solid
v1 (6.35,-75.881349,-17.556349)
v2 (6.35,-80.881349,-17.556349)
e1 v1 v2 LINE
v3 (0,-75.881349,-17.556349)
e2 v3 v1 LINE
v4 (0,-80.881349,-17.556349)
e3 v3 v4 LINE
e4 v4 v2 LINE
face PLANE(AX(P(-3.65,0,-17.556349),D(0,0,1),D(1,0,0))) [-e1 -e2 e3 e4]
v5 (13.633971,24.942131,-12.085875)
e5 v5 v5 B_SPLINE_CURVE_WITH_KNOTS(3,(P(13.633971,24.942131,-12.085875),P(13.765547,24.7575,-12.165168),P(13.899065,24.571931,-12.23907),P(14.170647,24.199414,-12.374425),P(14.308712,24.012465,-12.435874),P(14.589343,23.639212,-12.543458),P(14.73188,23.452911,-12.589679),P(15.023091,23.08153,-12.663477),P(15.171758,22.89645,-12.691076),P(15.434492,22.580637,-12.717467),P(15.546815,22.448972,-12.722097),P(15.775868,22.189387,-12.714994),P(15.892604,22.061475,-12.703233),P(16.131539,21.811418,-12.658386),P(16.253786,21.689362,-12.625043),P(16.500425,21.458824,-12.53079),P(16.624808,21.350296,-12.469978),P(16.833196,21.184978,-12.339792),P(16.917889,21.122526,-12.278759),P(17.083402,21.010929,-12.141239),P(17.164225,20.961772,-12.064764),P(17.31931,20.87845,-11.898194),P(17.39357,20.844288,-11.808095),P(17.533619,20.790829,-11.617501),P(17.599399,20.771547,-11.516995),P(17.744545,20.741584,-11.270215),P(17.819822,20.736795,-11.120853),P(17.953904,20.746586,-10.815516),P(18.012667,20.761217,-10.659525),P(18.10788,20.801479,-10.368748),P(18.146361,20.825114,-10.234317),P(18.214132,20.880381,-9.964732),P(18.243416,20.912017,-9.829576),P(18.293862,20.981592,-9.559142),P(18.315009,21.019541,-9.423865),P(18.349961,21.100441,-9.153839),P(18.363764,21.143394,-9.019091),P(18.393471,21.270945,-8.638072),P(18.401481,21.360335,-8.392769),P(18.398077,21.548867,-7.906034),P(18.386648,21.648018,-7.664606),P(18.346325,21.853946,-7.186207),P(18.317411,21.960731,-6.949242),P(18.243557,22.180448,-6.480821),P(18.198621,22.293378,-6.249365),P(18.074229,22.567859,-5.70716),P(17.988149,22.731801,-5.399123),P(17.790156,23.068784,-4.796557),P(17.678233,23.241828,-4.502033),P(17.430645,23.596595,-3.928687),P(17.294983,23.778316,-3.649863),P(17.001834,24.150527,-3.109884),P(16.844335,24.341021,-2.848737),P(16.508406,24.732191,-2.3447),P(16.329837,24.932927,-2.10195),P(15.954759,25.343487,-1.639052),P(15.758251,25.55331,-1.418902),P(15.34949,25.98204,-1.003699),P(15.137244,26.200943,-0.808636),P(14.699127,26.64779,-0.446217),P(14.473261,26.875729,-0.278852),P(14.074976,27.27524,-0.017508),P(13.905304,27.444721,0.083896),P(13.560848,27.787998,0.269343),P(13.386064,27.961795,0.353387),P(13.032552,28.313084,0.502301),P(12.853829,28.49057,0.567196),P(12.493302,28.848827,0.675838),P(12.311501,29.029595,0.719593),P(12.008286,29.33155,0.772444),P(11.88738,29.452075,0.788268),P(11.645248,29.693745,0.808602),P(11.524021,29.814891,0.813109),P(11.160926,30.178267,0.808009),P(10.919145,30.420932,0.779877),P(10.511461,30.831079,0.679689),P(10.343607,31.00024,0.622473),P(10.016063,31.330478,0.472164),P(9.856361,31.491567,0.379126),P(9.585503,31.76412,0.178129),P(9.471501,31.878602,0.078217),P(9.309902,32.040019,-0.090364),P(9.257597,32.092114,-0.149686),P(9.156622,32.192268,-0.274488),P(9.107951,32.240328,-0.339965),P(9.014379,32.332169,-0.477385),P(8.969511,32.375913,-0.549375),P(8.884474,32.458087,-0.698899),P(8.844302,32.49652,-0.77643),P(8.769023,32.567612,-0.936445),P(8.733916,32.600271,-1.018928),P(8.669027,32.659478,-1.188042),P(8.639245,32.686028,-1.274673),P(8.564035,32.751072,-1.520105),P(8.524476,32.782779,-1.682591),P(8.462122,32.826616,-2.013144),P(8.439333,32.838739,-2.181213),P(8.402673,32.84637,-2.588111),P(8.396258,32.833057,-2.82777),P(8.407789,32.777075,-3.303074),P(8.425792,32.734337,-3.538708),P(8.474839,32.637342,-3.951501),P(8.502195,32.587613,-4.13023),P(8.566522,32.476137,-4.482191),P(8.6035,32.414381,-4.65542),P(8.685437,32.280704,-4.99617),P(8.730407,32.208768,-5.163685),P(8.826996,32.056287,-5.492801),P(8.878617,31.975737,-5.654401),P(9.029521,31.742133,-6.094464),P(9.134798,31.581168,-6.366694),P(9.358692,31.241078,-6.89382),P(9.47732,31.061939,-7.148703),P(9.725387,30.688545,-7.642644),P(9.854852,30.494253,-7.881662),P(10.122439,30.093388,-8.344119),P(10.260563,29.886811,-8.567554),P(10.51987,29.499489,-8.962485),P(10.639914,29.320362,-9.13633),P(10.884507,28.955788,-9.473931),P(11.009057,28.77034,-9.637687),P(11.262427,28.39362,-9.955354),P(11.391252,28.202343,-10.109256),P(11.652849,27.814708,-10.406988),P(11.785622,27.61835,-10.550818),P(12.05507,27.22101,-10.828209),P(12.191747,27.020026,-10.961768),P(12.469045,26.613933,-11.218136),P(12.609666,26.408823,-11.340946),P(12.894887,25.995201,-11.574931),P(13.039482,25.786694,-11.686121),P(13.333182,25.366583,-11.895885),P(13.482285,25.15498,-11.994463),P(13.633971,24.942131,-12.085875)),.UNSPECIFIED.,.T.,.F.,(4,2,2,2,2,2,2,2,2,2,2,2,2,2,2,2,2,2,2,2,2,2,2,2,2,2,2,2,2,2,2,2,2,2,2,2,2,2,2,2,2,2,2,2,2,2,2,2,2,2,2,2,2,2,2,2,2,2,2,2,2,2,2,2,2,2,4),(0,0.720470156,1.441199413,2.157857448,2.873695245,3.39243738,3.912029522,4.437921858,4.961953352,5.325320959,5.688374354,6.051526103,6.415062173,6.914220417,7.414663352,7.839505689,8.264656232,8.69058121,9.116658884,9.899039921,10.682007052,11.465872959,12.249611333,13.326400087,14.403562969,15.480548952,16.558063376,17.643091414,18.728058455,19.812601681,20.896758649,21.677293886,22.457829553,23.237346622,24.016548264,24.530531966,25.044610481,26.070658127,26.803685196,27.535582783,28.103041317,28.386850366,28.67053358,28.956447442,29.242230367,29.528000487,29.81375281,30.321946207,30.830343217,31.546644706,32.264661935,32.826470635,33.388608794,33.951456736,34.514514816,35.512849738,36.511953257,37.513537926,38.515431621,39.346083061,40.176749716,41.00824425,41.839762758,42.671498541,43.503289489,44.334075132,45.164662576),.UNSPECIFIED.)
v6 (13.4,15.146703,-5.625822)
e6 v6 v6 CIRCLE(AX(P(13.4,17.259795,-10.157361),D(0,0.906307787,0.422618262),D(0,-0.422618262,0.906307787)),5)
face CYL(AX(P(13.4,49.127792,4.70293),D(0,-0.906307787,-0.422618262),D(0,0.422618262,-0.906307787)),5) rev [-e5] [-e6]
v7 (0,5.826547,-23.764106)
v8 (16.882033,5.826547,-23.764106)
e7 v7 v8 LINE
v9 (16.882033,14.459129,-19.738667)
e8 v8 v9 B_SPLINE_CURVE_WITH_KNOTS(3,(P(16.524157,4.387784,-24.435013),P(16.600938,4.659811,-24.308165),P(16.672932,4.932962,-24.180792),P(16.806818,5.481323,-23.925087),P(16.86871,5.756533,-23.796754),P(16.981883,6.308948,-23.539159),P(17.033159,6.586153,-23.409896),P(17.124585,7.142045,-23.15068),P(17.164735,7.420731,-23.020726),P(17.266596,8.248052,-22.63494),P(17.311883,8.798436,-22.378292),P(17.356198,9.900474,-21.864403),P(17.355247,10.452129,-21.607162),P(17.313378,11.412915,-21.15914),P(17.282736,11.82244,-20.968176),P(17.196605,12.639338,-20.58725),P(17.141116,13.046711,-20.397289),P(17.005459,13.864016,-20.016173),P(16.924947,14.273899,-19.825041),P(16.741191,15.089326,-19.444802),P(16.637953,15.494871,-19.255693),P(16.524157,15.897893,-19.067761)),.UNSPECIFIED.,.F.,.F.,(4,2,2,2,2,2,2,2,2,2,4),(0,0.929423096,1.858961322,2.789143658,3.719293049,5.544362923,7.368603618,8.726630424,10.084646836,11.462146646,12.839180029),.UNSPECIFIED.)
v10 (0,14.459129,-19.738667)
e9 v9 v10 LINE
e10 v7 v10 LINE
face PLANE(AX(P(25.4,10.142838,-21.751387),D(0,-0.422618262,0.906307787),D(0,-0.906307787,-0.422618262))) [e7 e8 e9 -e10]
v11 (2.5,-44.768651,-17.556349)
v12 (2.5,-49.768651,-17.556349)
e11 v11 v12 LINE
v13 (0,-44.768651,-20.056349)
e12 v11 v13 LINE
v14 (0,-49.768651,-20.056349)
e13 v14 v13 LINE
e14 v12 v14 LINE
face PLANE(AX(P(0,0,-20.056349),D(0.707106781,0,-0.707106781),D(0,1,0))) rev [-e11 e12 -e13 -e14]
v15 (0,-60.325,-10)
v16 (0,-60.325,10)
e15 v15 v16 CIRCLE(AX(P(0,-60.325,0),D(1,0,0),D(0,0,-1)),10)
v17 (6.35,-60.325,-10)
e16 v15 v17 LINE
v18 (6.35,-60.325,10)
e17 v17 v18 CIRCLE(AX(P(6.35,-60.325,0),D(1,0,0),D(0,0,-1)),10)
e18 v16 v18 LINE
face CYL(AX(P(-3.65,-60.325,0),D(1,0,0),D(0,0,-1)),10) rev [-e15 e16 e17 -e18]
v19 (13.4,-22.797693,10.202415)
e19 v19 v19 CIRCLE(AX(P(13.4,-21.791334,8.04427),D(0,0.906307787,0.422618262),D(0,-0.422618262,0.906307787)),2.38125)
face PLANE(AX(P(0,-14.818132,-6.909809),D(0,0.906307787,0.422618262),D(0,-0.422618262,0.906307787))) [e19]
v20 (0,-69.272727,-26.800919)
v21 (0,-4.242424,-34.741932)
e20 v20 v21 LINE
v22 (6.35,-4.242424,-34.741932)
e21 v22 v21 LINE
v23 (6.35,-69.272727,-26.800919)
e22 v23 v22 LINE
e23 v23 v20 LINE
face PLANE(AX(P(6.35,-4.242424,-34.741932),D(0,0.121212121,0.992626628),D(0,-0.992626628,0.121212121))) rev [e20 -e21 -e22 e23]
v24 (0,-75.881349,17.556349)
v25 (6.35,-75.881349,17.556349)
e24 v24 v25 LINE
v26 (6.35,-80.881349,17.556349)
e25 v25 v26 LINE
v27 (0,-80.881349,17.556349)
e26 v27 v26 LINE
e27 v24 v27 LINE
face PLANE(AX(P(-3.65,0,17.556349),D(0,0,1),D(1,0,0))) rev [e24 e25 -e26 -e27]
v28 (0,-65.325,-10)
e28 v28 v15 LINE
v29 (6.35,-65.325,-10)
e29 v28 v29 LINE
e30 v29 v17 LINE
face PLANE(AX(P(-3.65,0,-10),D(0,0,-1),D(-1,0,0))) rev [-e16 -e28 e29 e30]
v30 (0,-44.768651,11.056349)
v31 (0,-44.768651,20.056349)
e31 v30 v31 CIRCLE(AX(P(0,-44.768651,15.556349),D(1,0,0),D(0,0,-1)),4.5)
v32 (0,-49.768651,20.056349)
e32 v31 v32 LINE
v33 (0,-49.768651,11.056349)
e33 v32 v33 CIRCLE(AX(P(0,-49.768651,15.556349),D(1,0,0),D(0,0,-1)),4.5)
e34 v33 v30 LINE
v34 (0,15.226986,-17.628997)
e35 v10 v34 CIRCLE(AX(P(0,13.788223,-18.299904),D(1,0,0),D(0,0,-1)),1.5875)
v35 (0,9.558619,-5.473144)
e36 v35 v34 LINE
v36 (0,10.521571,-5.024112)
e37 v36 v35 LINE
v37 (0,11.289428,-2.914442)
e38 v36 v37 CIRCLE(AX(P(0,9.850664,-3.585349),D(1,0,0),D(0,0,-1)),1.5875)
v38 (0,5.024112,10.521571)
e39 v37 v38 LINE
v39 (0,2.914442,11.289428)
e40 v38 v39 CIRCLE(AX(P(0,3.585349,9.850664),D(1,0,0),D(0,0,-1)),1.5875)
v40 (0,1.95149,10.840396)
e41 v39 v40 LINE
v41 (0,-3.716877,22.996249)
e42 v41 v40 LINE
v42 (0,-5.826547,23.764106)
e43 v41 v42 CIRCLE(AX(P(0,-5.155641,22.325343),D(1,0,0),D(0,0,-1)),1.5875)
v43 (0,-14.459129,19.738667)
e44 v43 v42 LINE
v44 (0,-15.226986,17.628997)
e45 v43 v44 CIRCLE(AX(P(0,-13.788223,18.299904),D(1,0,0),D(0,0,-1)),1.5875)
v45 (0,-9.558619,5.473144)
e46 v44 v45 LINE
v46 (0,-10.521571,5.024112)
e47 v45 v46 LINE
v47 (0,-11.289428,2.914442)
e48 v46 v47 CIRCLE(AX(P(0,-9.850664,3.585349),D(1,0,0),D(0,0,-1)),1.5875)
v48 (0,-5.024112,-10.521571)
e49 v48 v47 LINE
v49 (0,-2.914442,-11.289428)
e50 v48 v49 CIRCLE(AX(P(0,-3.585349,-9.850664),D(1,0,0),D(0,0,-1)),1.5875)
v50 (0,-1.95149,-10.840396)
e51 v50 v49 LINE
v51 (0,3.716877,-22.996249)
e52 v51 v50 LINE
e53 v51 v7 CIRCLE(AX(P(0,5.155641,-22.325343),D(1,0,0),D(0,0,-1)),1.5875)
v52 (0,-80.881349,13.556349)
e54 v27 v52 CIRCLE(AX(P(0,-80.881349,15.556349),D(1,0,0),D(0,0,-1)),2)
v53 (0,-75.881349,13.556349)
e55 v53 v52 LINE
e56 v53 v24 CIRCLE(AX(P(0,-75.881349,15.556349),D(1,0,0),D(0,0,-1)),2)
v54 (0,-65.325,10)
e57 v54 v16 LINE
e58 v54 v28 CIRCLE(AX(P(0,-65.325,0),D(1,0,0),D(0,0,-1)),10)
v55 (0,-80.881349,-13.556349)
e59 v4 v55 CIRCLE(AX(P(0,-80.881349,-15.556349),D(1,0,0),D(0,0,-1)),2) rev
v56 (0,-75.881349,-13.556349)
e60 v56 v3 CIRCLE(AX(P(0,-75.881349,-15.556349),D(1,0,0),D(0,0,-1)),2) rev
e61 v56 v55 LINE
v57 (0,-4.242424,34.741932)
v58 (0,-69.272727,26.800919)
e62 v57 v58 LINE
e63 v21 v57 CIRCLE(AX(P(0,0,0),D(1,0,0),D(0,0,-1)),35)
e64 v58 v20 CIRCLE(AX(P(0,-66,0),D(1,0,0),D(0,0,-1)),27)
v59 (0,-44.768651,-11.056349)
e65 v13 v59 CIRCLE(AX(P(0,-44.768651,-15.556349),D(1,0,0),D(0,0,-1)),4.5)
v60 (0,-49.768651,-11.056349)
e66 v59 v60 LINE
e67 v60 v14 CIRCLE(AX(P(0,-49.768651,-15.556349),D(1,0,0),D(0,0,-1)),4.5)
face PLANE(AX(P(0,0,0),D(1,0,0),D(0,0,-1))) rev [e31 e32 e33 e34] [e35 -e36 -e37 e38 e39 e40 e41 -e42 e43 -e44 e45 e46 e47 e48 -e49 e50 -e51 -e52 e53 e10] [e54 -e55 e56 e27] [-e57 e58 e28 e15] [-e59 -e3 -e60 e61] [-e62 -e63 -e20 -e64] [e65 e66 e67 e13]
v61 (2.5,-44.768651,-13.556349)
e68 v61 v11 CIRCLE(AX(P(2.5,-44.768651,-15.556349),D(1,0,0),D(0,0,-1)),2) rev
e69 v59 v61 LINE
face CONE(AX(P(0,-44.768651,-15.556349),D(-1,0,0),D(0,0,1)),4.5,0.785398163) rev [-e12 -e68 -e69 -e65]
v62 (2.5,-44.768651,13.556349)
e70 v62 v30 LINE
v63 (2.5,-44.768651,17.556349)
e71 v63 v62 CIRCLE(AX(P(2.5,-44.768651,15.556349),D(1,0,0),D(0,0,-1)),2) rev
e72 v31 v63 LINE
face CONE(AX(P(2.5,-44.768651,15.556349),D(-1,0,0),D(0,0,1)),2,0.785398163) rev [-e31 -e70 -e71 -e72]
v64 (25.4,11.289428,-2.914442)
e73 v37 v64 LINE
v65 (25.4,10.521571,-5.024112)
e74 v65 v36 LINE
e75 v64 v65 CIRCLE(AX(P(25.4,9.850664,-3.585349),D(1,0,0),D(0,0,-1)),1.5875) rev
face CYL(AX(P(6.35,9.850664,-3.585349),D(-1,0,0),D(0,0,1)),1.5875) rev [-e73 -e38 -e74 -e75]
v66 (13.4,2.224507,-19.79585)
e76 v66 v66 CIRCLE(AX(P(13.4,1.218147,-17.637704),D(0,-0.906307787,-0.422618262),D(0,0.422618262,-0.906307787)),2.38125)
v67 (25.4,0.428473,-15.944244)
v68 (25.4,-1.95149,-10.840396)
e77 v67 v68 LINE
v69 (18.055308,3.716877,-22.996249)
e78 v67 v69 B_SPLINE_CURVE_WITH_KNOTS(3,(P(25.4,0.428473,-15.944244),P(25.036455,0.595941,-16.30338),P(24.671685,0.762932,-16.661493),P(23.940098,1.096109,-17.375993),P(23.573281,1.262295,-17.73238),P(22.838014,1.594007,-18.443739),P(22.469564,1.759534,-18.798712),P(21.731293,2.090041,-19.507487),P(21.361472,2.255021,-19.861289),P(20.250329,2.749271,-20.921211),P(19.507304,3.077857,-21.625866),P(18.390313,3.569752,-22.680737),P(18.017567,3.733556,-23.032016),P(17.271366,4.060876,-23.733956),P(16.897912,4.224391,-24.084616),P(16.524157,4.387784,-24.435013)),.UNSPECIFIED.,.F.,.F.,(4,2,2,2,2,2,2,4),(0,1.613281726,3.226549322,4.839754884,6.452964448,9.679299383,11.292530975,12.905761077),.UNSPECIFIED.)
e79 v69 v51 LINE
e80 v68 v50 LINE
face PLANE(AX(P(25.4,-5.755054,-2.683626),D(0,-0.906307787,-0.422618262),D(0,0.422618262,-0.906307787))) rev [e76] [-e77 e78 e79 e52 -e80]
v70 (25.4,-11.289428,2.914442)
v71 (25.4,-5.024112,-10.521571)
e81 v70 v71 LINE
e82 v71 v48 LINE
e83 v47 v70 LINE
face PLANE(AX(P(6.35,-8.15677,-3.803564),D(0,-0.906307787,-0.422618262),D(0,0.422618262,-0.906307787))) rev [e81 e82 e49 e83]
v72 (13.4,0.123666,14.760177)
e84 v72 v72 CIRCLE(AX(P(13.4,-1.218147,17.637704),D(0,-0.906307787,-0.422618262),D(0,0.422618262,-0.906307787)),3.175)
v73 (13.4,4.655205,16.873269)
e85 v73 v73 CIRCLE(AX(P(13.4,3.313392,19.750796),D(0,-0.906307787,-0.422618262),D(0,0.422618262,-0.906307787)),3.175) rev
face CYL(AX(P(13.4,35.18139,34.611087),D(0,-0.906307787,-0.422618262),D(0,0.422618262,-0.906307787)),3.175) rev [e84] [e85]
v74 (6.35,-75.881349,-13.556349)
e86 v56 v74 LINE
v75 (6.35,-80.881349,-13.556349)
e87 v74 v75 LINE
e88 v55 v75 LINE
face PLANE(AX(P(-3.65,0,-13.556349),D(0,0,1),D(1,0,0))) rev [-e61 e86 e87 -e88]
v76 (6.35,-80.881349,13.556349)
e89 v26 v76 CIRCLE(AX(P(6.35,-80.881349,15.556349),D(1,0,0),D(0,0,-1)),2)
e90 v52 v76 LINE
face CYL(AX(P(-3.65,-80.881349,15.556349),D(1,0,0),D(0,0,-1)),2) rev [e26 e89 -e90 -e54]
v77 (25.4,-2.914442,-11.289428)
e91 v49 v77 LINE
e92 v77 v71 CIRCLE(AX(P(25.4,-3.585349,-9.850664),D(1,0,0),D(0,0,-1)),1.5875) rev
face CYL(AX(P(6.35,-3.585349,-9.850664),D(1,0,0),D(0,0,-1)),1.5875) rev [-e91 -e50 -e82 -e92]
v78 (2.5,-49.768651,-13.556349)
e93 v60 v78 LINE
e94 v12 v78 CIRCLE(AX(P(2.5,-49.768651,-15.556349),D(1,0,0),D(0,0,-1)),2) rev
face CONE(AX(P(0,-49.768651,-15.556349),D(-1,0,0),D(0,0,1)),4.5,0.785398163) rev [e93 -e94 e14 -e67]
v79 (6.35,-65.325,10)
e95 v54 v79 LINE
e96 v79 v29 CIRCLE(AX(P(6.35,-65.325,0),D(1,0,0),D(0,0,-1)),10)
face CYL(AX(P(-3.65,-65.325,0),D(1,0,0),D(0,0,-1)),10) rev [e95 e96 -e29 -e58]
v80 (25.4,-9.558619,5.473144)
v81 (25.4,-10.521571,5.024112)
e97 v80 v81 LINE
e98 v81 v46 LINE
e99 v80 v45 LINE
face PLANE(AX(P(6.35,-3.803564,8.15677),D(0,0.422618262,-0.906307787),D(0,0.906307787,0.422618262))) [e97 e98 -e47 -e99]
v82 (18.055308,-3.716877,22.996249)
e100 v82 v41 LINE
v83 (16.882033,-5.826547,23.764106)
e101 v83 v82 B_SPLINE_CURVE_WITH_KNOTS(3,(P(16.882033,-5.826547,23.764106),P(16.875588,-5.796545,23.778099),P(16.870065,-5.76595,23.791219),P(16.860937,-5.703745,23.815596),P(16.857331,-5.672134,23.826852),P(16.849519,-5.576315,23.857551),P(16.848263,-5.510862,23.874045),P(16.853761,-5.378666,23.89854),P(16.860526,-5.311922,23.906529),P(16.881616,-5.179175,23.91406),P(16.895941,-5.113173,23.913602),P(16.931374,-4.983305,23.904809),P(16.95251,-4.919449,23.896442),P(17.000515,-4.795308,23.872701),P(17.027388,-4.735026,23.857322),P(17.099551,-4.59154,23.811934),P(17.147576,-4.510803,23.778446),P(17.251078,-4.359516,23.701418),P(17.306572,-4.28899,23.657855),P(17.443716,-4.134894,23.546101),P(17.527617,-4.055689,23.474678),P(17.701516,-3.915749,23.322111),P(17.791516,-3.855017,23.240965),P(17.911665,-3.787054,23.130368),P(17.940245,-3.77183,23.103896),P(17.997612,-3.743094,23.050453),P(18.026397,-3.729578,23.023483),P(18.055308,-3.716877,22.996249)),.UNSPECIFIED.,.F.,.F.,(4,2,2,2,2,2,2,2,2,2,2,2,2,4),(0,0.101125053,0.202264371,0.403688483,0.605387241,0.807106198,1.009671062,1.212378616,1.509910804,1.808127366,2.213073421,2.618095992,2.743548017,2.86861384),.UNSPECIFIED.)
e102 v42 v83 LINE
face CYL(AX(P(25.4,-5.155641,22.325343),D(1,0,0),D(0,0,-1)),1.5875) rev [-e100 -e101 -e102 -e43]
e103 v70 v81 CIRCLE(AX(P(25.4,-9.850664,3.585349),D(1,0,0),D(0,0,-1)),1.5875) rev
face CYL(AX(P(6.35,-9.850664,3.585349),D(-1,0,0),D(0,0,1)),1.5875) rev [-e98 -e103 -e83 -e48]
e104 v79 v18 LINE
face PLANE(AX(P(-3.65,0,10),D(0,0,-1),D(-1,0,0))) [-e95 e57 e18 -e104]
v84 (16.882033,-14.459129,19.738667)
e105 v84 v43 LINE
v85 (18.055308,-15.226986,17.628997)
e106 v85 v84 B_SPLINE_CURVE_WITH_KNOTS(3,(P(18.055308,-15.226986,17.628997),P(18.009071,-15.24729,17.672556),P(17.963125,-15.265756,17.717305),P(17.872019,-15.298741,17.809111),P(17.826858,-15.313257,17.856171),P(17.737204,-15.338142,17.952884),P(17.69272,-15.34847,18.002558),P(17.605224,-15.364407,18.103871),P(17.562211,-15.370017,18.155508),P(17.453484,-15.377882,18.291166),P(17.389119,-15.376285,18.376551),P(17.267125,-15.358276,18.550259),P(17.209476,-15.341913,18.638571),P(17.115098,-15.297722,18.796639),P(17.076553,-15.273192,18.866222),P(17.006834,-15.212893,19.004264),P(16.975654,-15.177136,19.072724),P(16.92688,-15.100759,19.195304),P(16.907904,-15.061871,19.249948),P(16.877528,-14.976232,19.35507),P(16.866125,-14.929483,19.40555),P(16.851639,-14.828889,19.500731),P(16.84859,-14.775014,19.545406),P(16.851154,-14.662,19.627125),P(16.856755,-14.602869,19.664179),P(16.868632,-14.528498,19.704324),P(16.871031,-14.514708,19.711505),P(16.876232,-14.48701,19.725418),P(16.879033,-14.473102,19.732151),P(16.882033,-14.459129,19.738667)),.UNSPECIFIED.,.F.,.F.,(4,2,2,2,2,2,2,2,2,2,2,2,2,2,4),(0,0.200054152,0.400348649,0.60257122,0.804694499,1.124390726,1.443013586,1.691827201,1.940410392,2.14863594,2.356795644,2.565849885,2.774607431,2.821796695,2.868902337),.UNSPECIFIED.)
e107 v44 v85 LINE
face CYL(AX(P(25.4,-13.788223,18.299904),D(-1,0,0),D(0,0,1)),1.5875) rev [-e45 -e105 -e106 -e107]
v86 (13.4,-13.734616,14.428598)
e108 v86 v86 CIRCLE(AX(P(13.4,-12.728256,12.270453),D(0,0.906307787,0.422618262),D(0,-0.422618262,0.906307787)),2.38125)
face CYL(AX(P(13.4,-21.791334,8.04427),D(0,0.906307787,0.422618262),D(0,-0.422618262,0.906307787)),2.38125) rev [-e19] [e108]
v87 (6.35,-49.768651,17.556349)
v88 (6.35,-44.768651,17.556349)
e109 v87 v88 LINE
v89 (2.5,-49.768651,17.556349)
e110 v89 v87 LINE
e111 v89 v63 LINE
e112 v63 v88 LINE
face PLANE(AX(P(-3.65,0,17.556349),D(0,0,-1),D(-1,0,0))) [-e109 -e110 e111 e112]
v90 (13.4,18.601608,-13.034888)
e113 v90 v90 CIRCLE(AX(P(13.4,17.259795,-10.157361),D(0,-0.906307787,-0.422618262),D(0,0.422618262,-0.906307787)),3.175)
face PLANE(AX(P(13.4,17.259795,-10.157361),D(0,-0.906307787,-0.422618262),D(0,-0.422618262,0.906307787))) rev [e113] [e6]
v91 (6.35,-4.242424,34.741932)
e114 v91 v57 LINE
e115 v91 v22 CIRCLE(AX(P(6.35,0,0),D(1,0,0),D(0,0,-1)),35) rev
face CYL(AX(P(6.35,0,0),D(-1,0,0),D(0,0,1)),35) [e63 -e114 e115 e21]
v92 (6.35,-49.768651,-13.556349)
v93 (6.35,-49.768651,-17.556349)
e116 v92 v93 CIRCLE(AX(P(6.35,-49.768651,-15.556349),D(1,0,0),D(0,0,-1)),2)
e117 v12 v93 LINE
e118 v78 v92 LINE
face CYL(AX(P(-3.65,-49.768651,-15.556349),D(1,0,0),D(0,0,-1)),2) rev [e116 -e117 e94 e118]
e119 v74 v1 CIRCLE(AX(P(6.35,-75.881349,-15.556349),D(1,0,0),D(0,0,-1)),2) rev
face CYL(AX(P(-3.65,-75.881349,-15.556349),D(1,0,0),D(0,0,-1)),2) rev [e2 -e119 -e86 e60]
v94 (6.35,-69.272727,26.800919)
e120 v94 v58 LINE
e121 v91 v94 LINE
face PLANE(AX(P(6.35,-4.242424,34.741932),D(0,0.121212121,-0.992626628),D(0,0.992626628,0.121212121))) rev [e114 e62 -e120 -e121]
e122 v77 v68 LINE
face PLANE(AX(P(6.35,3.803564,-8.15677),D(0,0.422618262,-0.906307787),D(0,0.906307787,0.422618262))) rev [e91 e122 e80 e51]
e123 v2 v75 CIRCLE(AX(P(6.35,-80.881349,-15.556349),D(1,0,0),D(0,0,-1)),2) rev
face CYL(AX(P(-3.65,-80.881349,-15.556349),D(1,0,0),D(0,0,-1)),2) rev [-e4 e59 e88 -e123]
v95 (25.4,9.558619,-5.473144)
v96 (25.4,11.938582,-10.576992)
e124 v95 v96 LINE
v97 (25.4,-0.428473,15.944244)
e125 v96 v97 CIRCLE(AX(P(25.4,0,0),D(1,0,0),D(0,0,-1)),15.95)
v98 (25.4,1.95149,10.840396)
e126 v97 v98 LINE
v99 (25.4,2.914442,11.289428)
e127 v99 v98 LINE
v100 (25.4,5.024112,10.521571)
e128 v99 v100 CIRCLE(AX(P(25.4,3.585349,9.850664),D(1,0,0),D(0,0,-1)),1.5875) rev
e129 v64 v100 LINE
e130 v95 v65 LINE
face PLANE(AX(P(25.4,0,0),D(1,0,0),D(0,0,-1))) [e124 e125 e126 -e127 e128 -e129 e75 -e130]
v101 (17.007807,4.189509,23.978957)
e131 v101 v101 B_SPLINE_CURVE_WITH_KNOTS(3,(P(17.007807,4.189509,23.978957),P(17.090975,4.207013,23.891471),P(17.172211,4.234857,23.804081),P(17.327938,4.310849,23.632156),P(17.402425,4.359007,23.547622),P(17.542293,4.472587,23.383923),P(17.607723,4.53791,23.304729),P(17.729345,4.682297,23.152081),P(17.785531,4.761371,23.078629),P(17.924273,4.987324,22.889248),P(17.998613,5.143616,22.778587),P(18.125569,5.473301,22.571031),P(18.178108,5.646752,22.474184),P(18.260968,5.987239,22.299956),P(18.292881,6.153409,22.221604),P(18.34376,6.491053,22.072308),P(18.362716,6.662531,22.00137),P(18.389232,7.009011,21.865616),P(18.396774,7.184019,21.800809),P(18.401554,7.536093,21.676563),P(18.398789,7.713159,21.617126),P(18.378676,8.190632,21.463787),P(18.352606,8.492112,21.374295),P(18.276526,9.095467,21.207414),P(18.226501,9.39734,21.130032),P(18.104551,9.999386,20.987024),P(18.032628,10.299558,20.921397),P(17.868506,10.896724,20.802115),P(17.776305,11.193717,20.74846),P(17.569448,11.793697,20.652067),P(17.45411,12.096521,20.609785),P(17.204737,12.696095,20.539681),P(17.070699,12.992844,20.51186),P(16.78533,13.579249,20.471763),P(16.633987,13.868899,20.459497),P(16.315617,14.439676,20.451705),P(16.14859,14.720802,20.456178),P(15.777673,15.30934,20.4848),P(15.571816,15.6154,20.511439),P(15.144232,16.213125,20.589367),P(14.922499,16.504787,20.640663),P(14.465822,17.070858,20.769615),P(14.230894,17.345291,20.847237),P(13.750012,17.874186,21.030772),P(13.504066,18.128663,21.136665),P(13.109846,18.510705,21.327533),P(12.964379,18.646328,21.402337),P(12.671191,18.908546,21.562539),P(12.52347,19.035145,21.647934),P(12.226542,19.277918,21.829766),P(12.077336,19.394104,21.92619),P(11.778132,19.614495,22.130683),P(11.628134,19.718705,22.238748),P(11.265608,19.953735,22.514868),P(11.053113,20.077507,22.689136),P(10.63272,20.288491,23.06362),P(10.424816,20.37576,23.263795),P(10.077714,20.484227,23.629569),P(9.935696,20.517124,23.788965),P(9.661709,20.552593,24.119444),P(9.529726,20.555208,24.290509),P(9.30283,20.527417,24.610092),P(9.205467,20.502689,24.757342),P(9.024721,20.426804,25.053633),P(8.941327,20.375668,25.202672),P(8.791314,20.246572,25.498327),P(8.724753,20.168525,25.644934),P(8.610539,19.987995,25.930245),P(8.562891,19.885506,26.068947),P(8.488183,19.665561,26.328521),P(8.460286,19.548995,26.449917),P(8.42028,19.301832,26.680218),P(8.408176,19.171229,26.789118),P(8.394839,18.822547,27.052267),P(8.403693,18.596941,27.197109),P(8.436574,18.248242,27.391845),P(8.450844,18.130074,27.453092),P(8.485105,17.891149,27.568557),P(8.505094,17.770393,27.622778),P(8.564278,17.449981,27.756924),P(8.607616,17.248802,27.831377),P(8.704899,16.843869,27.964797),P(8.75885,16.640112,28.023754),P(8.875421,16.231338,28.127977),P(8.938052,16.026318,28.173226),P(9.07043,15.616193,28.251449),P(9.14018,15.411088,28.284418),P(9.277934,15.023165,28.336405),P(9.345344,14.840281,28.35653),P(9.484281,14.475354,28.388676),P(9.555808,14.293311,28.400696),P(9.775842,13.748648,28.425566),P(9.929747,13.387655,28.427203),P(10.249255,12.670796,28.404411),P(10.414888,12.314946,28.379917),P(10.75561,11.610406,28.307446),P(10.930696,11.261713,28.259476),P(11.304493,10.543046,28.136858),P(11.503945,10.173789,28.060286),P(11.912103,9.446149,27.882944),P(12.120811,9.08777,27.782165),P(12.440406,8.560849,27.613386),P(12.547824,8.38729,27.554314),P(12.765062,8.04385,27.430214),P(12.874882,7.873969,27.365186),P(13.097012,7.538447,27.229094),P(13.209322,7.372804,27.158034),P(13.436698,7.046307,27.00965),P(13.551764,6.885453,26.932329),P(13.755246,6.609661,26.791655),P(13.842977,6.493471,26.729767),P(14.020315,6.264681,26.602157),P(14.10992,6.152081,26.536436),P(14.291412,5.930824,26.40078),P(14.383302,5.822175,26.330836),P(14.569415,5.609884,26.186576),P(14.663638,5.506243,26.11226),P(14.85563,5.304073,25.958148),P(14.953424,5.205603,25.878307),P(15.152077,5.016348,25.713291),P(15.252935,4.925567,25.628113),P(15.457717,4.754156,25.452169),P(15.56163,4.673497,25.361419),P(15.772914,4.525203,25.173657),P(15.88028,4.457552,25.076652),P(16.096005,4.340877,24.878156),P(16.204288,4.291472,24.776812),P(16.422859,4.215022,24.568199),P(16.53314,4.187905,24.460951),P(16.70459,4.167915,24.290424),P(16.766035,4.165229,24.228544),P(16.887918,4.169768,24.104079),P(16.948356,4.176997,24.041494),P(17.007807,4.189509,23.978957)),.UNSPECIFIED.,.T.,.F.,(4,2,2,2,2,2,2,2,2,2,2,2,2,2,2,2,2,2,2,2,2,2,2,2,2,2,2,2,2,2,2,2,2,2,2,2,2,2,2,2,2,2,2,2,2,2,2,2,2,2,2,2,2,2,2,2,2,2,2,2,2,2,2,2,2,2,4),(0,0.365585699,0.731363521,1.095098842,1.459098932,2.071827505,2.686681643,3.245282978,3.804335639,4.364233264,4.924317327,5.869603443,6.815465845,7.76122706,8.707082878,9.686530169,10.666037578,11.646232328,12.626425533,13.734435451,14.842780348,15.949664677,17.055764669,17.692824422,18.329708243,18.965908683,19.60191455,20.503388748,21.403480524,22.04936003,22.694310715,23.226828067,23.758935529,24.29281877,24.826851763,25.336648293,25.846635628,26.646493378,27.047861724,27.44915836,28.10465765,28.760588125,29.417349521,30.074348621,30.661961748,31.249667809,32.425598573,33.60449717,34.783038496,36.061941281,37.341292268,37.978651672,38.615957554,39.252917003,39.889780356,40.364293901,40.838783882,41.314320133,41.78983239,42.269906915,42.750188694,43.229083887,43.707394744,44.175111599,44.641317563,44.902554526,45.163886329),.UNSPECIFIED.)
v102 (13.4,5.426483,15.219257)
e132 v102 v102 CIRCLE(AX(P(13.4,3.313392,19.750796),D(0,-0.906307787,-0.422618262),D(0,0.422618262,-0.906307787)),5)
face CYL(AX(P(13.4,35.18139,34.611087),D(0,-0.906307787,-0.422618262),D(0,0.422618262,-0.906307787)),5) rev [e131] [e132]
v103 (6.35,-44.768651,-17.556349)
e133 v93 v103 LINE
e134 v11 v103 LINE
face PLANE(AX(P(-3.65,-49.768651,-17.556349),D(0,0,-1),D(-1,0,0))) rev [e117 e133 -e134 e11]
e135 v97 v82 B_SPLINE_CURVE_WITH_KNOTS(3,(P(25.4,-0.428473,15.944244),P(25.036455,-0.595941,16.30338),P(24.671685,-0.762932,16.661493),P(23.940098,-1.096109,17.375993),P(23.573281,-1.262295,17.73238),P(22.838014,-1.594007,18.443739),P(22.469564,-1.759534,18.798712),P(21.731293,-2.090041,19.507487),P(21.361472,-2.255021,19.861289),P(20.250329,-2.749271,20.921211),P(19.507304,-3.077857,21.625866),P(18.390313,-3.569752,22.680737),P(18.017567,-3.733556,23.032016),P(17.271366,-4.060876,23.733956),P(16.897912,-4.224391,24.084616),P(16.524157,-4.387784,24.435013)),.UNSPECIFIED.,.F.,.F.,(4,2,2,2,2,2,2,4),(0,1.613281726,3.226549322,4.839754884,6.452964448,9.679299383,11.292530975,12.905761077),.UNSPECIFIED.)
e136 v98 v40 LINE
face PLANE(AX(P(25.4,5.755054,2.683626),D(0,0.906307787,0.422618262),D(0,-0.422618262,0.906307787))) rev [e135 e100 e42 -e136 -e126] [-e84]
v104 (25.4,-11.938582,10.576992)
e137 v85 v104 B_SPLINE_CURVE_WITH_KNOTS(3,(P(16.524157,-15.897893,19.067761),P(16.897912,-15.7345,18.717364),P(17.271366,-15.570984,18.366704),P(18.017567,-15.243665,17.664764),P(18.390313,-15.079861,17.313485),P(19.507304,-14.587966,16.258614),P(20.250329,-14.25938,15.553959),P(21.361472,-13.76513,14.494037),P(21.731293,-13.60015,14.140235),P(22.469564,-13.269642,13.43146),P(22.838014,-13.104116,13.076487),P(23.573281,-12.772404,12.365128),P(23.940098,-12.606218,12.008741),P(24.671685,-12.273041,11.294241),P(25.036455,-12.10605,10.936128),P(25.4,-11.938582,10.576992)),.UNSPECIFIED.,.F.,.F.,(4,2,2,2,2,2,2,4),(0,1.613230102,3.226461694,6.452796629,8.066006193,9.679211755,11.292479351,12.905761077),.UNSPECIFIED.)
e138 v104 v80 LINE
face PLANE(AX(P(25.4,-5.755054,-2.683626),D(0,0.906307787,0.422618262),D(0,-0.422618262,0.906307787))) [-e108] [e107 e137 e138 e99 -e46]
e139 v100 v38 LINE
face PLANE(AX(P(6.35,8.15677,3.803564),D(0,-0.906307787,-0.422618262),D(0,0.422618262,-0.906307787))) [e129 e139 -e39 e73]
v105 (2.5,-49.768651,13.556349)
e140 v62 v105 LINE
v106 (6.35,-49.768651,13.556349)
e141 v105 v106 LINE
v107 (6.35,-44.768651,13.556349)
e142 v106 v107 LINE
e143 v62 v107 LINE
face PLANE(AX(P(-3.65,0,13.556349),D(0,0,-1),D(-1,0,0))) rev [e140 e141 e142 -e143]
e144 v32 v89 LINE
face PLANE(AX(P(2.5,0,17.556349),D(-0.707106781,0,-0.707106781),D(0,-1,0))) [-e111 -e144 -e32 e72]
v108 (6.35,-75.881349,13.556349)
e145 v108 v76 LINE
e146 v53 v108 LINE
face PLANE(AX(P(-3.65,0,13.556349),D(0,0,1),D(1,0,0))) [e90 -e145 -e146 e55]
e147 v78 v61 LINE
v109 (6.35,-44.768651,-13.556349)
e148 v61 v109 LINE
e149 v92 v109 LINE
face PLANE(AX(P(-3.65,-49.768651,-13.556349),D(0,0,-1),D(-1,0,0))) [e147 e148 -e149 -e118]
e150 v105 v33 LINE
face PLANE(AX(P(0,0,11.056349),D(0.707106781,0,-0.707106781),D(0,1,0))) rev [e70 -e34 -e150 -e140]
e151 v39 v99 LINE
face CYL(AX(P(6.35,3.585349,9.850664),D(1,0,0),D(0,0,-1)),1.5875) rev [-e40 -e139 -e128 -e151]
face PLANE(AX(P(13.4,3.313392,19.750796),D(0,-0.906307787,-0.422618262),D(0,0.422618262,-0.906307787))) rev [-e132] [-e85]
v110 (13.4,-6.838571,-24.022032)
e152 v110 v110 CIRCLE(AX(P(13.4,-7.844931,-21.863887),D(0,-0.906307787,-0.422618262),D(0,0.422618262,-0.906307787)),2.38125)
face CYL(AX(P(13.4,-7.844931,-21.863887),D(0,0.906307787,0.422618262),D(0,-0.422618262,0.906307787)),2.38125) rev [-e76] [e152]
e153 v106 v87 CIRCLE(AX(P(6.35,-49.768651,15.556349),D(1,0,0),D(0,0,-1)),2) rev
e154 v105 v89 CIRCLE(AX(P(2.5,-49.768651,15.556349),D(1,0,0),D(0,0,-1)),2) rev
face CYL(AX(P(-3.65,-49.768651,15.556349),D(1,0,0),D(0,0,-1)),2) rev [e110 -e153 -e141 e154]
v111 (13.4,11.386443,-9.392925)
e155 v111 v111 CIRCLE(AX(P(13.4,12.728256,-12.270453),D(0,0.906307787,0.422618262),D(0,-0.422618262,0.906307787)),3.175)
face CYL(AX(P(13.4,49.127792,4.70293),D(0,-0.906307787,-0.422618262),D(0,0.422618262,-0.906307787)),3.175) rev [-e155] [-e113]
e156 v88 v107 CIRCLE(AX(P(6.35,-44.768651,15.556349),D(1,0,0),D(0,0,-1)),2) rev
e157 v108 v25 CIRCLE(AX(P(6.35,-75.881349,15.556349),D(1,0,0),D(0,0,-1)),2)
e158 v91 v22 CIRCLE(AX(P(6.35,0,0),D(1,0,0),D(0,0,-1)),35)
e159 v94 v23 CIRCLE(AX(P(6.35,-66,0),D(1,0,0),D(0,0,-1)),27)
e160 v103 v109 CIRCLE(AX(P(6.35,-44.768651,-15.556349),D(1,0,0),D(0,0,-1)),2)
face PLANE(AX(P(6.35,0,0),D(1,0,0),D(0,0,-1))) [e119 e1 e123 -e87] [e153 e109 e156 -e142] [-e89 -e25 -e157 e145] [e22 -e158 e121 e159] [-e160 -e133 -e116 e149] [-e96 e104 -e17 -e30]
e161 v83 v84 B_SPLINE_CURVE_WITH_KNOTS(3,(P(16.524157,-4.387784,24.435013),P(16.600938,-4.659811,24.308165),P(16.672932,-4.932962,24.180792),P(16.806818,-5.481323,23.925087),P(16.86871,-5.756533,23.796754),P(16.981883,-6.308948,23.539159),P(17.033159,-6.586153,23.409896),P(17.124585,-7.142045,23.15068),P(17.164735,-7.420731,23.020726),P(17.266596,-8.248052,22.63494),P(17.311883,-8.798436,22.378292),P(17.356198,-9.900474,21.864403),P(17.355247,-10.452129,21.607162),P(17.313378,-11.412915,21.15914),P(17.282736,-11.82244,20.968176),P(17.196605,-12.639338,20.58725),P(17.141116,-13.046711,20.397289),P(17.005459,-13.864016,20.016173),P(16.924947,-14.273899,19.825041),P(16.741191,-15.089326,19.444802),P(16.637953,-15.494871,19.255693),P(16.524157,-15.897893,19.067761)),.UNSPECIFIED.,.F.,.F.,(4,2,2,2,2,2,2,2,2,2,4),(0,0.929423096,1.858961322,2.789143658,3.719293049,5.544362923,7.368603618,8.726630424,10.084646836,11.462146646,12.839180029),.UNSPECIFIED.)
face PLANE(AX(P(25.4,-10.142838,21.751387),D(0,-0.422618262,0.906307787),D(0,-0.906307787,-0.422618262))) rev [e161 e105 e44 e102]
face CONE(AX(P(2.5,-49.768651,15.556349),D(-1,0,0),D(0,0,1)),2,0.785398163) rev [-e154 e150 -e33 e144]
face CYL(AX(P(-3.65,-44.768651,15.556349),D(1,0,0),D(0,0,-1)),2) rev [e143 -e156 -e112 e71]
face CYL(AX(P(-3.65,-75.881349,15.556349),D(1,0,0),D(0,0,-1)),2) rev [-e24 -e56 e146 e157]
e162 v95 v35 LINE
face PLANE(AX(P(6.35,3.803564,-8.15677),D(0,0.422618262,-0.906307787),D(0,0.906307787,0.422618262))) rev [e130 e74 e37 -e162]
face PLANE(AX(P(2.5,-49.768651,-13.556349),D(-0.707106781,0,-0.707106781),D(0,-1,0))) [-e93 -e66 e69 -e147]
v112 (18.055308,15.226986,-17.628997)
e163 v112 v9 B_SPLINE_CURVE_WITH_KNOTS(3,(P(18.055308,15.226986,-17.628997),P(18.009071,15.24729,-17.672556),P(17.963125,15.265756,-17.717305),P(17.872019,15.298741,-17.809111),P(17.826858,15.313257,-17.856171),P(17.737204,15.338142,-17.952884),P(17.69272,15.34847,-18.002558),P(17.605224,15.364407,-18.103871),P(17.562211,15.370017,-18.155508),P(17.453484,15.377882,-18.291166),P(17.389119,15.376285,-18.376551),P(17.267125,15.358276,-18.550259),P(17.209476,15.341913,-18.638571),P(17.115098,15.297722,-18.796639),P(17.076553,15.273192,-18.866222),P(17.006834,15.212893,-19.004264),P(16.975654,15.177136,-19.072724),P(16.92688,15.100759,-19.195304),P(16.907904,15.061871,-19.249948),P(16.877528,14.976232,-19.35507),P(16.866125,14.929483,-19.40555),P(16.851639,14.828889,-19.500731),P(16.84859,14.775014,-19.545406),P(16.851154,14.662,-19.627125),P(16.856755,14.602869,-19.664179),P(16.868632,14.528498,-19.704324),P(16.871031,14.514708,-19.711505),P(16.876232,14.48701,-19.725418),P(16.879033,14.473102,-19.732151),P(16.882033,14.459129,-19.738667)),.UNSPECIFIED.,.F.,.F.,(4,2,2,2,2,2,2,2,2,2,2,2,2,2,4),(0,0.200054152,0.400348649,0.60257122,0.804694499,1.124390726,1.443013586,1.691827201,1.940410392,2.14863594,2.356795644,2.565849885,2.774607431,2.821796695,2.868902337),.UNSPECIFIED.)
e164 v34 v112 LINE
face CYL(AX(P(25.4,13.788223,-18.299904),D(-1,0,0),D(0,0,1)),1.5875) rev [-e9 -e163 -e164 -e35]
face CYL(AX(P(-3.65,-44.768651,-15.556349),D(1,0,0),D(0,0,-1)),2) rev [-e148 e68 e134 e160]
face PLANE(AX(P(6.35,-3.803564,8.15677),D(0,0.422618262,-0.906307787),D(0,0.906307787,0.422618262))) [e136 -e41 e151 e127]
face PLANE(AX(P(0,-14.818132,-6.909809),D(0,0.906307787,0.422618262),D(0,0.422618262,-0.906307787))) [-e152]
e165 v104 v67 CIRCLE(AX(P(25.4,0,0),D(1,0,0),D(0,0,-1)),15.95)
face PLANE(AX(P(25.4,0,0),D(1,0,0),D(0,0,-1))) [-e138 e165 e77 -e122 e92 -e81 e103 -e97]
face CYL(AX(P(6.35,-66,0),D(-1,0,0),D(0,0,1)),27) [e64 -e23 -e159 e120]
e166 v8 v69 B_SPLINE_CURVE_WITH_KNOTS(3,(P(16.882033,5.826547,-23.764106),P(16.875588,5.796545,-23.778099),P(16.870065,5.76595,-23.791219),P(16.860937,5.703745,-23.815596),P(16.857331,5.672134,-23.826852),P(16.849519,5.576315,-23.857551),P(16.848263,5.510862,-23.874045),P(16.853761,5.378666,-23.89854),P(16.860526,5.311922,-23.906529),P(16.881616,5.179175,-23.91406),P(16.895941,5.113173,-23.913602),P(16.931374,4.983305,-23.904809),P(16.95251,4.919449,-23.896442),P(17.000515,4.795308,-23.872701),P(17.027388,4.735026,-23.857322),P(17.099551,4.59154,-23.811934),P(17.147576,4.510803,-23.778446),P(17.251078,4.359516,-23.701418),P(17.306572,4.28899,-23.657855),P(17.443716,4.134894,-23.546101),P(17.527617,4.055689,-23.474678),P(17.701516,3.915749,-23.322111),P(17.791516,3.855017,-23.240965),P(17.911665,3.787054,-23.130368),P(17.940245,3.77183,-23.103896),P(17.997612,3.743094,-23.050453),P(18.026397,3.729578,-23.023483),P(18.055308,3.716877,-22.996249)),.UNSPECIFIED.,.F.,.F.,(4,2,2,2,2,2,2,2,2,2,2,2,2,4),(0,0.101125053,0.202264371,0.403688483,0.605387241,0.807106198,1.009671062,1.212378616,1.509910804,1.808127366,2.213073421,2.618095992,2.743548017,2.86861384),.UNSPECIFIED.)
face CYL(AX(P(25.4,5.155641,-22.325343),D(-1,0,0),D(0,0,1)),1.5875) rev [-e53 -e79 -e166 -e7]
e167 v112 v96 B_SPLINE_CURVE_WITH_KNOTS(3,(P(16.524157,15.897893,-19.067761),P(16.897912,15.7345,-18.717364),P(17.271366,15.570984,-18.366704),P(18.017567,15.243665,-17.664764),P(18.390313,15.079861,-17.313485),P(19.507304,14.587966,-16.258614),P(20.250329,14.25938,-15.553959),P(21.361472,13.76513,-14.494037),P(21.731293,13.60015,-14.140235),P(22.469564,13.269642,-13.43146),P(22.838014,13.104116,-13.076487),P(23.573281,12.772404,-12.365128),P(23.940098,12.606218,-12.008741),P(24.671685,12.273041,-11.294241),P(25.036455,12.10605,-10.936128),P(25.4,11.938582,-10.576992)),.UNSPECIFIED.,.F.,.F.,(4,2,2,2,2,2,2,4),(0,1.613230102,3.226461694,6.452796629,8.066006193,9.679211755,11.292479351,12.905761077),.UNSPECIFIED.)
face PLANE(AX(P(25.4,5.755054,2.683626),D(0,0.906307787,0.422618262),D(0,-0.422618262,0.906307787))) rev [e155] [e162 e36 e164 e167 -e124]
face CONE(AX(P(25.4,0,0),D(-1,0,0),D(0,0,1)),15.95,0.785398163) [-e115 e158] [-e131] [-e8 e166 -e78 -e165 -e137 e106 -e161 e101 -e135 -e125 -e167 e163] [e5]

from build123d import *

# Parameters (mm, degrees)
BOSS_EXTRUDE1_DEPTH = 6.35
SKETCH20_R          = 35
BOSS_EXTRUDE5_DEPTH = 19.05
CUT_EXTRUDE14_DEPTH = 103.562956276
CHAMFER1_SIZE       = 19.05
SKETCH22_R          = 3.175
CUT_EXTRUDE15_DEPTH = 109.709596838
SKETCH24_R          = 5
CUT_EXTRUDE16_DEPTH = 114.565219549
SKETCH25_R          = 2.38125
CUT_EXTRUDE17_DEPTH = 10
CUT_EXTRUDE18_DEPTH = 10
CHAMFER2_SIZE       = 2.5
FILLET1_R           = 1.5875


with BuildPart() as part:
    # Sketch1 → Boss-Extrude1 (new body)
    with BuildSketch(Plane(origin=(0, 0, 0), x_dir=(0, 0, -1), z_dir=(1, 0, 0))):
        with BuildLine():
            Line((-34.741931963, -4.242424242), (-26.800918943, -69.272727273))
            ThreePointArc((-26.800918943, -69.272727273), (0, -93), (26.800918943, -69.272727273))
            Line((26.800918943, -69.272727273), (34.741931963, -4.242424242))
            ThreePointArc((34.741931963, -4.242424242), (0, 35), (-34.741931963, -4.242424242))
        make_face()
        Polygon((4.353205728, 11.960334439), (-11.960334439, 4.353205728), (-4.353205728, -11.960334439), (11.960334439, -4.353205728), align=None, mode=Mode.SUBTRACT)
    extrude(amount=BOSS_EXTRUDE1_DEPTH)

    # Sketch20 → Boss-Extrude5 (add)
    with BuildSketch(Plane(origin=(6.35, 0, 0), x_dir=(0, 0, -1), z_dir=(1, 0, 0))):
        with Locations(Location((0, 0, 0), (0, 0, 186.962062691))):
            Circle(SKETCH20_R)
    extrude(amount=BOSS_EXTRUDE5_DEPTH)

    # Sketch21 → Cut-Extrude14 (cut, through all)
    with BuildSketch(Plane.ZY):
        Polygon((-19.067760927, 15.897892729), (-24.435012851, 4.387783834), (-10.840396045, -1.951490092), (-5.473144121, 9.558618803), align=None)
        Polygon((-11.960334439, -4.353205728), (-4.353205728, 11.960334439), (11.960334439, 4.353205728), (4.353205728, -11.960334439), align=None)
        Polygon((10.840396045, 1.951490092), (5.473144121, -9.558618803), (19.067760927, -15.897892729), (24.435012851, -4.387783834), align=None)
    extrude(amount=-CUT_EXTRUDE14_DEPTH, mode=Mode.SUBTRACT)

    # Chamfer1
    # the kernel refuses this chamfer: 19.05 mm, written as the material it takes off along each edge
    with BuildSketch(Plane(origin=(25.4, 0, 0), x_dir=(0, -0.1212121212106579, 0.9926266275249788), z_dir=(0, 0.9926266275249788, 0.1212121212106579))) as chamfer1_piece_1:
        Polygon((35, -CHAMFER1_SIZE), (35 - CHAMFER1_SIZE, 0), (35, 0), align=None)
    revolve(axis=Axis((25.4, 0, 0), (1, 0, 0)), mode=Mode.SUBTRACT)

    # Sketch22 → Cut-Extrude15 (cut, through all)
    with BuildSketch(Plane(origin=(0, 5.755054448, 2.683625962), x_dir=(-1, 0, 0), z_dir=(0, -0.9063077870366495, -0.4226182617407006))):
        with Locations(Location((-13.4, -16.5, 0), (0, 0, 90))):
            Circle(SKETCH22_R)
    cut_extrude15 = extrude(amount=-CUT_EXTRUDE15_DEPTH, mode=Mode.SUBTRACT)

    # Sketch24 → Cut-Extrude16 (cut, through all)
    with BuildSketch(Plane(origin=(0, 10.286593383, 4.796717271), x_dir=(-1, 0, 0), z_dir=(0, -0.9063077870366495, -0.4226182617407006))):
        with Locations(Location((-13.4, -16.5, 0), (0, 0, 90))):
            Circle(SKETCH24_R)
    cut_extrude16 = extrude(amount=-CUT_EXTRUDE16_DEPTH, mode=Mode.SUBTRACT)

    # Sketch25 → Cut-Extrude17 (cut)
    with BuildSketch(Plane(origin=(0, -5.755054448, -2.683625962), x_dir=(1, 0, 0), z_dir=(0, 0.9063077870366495, 0.4226182617407006))):
        with Locations(Location((13.4, -16.5, 0), (0, 0, 270))):
            Circle(SKETCH25_R)
    cut_extrude17 = extrude(amount=-CUT_EXTRUDE17_DEPTH, mode=Mode.SUBTRACT)

    # Mirror1: Cut-Extrude15, Cut-Extrude16, Cut-Extrude17 across plane
    add(cut_extrude15.mirror(Plane(origin=(0, 0, 0), x_dir=(1, 0, 0), z_dir=(0, 0.422618261740701, -0.9063077870366492))), mode=Mode.SUBTRACT)
    add(cut_extrude16.mirror(Plane(origin=(0, 0, 0), x_dir=(1, 0, 0), z_dir=(0, 0.422618261740701, -0.9063077870366492))), mode=Mode.SUBTRACT)
    add(cut_extrude17.mirror(Plane(origin=(0, 0, 0), x_dir=(1, 0, 0), z_dir=(0, 0.422618261740701, -0.9063077870366492))), mode=Mode.SUBTRACT)

    # Sketch19 → Cut-Extrude18 (cut)
    with BuildSketch(Plane(origin=(6.35, 0, 0), x_dir=(0, 0, -1), z_dir=(1, 0, 0))):
        with BuildLine():
            Line((13.556349186, -44.768650814), (13.556349186, -49.768650814))
            ThreePointArc((13.556349186, -49.768650814), (15.556349186, -51.768650814), (17.556349186, -49.768650814))
            Line((17.556349186, -49.768650814), (17.556349186, -44.768650814))
            ThreePointArc((17.556349186, -44.768650814), (15.556349186, -42.768650814), (13.556349186, -44.768650814))
        make_face()
        with BuildLine():
            Line((-10, -60.325), (-10, -65.325))
            ThreePointArc((-10, -65.325), (0, -75.325), (10, -65.325))
            Line((10, -65.325), (10, -60.325))
            ThreePointArc((10, -60.325), (0, -50.325), (-10, -60.325))
        make_face()
        with BuildLine():
            Line((17.556349186, -80.881349186), (17.556349186, -75.881349186))
            ThreePointArc((17.556349186, -75.881349186), (15.556349186, -73.881349186), (13.556349186, -75.881349186))
            Line((13.556349186, -75.881349186), (13.556349186, -80.881349186))
            ThreePointArc((13.556349186, -80.881349186), (15.556349186, -82.881349186), (17.556349186, -80.881349186))
        make_face()
        with BuildLine():
            Line((-17.556349186, -44.768650814), (-17.556349186, -49.768650814))
            ThreePointArc((-17.556349186, -49.768650814), (-15.556349186, -51.768650814), (-13.556349186, -49.768650814))
            Line((-13.556349186, -49.768650814), (-13.556349186, -44.768650814))
            ThreePointArc((-13.556349186, -44.768650814), (-15.556349186, -42.768650814), (-17.556349186, -44.768650814))
        make_face()
        with BuildLine():
            Line((-13.556349186, -80.881349186), (-13.556349186, -75.881349186))
            ThreePointArc((-13.556349186, -75.881349186), (-15.556349186, -73.881349186), (-17.556349186, -75.881349186))
            Line((-17.556349186, -75.881349186), (-17.556349186, -80.881349186))
            ThreePointArc((-17.556349186, -80.881349186), (-15.556349186, -82.881349186), (-13.556349186, -80.881349186))
        make_face()
    extrude(amount=-CUT_EXTRUDE18_DEPTH, mode=Mode.SUBTRACT)


with BuildPart() as body_2:
    # Mirror2: mirrored copy
    add(part.part.mirror(Plane(origin=(0, 0, 0), x_dir=(0, 0, 1), z_dir=(1, 0, 0))))


with BuildPart() as part_1:
    add(part.part)

    # Chamfer2
    chamfer2_edges = [part_1.edges().sort_by_distance(p)[0] for p in [
        (0, -47.268650814, 13.556349186),
        (0, -42.768650814, 15.556349186),
        (0, -47.268650814, 17.556349186),
        (0, -51.768650814, 15.556349186),
        (0, -47.268650814, -17.556349186),
        (0, -42.768650814, -15.556349186),
        (0, -47.268650814, -13.556349186),
        (0, -51.768650814, -15.556349186),
    ]]
    chamfer(chamfer2_edges, length=CHAMFER2_SIZE)

    # Fillet1
    fillet1_edges = [part_1.edges().sort_by_distance(p)[0] for p in [
        (12.7, -4.353205728, -11.960334439),
        (8.262078305, 4.387783834, -24.435012851),
        (12.7, 11.960334439, -4.353205728),
        (8.262078305, 15.897892729, -19.067760927),
        (8.262078305, -4.387783834, 24.435012851),
        (12.7, 4.353205728, 11.960334439),
        (12.7, -11.960334439, 4.353205728),
        (8.262078305, -15.897892729, 19.067760927),
    ]]
    fillet(fillet1_edges, radius=FILLET1_R)


solid = part_1.part
